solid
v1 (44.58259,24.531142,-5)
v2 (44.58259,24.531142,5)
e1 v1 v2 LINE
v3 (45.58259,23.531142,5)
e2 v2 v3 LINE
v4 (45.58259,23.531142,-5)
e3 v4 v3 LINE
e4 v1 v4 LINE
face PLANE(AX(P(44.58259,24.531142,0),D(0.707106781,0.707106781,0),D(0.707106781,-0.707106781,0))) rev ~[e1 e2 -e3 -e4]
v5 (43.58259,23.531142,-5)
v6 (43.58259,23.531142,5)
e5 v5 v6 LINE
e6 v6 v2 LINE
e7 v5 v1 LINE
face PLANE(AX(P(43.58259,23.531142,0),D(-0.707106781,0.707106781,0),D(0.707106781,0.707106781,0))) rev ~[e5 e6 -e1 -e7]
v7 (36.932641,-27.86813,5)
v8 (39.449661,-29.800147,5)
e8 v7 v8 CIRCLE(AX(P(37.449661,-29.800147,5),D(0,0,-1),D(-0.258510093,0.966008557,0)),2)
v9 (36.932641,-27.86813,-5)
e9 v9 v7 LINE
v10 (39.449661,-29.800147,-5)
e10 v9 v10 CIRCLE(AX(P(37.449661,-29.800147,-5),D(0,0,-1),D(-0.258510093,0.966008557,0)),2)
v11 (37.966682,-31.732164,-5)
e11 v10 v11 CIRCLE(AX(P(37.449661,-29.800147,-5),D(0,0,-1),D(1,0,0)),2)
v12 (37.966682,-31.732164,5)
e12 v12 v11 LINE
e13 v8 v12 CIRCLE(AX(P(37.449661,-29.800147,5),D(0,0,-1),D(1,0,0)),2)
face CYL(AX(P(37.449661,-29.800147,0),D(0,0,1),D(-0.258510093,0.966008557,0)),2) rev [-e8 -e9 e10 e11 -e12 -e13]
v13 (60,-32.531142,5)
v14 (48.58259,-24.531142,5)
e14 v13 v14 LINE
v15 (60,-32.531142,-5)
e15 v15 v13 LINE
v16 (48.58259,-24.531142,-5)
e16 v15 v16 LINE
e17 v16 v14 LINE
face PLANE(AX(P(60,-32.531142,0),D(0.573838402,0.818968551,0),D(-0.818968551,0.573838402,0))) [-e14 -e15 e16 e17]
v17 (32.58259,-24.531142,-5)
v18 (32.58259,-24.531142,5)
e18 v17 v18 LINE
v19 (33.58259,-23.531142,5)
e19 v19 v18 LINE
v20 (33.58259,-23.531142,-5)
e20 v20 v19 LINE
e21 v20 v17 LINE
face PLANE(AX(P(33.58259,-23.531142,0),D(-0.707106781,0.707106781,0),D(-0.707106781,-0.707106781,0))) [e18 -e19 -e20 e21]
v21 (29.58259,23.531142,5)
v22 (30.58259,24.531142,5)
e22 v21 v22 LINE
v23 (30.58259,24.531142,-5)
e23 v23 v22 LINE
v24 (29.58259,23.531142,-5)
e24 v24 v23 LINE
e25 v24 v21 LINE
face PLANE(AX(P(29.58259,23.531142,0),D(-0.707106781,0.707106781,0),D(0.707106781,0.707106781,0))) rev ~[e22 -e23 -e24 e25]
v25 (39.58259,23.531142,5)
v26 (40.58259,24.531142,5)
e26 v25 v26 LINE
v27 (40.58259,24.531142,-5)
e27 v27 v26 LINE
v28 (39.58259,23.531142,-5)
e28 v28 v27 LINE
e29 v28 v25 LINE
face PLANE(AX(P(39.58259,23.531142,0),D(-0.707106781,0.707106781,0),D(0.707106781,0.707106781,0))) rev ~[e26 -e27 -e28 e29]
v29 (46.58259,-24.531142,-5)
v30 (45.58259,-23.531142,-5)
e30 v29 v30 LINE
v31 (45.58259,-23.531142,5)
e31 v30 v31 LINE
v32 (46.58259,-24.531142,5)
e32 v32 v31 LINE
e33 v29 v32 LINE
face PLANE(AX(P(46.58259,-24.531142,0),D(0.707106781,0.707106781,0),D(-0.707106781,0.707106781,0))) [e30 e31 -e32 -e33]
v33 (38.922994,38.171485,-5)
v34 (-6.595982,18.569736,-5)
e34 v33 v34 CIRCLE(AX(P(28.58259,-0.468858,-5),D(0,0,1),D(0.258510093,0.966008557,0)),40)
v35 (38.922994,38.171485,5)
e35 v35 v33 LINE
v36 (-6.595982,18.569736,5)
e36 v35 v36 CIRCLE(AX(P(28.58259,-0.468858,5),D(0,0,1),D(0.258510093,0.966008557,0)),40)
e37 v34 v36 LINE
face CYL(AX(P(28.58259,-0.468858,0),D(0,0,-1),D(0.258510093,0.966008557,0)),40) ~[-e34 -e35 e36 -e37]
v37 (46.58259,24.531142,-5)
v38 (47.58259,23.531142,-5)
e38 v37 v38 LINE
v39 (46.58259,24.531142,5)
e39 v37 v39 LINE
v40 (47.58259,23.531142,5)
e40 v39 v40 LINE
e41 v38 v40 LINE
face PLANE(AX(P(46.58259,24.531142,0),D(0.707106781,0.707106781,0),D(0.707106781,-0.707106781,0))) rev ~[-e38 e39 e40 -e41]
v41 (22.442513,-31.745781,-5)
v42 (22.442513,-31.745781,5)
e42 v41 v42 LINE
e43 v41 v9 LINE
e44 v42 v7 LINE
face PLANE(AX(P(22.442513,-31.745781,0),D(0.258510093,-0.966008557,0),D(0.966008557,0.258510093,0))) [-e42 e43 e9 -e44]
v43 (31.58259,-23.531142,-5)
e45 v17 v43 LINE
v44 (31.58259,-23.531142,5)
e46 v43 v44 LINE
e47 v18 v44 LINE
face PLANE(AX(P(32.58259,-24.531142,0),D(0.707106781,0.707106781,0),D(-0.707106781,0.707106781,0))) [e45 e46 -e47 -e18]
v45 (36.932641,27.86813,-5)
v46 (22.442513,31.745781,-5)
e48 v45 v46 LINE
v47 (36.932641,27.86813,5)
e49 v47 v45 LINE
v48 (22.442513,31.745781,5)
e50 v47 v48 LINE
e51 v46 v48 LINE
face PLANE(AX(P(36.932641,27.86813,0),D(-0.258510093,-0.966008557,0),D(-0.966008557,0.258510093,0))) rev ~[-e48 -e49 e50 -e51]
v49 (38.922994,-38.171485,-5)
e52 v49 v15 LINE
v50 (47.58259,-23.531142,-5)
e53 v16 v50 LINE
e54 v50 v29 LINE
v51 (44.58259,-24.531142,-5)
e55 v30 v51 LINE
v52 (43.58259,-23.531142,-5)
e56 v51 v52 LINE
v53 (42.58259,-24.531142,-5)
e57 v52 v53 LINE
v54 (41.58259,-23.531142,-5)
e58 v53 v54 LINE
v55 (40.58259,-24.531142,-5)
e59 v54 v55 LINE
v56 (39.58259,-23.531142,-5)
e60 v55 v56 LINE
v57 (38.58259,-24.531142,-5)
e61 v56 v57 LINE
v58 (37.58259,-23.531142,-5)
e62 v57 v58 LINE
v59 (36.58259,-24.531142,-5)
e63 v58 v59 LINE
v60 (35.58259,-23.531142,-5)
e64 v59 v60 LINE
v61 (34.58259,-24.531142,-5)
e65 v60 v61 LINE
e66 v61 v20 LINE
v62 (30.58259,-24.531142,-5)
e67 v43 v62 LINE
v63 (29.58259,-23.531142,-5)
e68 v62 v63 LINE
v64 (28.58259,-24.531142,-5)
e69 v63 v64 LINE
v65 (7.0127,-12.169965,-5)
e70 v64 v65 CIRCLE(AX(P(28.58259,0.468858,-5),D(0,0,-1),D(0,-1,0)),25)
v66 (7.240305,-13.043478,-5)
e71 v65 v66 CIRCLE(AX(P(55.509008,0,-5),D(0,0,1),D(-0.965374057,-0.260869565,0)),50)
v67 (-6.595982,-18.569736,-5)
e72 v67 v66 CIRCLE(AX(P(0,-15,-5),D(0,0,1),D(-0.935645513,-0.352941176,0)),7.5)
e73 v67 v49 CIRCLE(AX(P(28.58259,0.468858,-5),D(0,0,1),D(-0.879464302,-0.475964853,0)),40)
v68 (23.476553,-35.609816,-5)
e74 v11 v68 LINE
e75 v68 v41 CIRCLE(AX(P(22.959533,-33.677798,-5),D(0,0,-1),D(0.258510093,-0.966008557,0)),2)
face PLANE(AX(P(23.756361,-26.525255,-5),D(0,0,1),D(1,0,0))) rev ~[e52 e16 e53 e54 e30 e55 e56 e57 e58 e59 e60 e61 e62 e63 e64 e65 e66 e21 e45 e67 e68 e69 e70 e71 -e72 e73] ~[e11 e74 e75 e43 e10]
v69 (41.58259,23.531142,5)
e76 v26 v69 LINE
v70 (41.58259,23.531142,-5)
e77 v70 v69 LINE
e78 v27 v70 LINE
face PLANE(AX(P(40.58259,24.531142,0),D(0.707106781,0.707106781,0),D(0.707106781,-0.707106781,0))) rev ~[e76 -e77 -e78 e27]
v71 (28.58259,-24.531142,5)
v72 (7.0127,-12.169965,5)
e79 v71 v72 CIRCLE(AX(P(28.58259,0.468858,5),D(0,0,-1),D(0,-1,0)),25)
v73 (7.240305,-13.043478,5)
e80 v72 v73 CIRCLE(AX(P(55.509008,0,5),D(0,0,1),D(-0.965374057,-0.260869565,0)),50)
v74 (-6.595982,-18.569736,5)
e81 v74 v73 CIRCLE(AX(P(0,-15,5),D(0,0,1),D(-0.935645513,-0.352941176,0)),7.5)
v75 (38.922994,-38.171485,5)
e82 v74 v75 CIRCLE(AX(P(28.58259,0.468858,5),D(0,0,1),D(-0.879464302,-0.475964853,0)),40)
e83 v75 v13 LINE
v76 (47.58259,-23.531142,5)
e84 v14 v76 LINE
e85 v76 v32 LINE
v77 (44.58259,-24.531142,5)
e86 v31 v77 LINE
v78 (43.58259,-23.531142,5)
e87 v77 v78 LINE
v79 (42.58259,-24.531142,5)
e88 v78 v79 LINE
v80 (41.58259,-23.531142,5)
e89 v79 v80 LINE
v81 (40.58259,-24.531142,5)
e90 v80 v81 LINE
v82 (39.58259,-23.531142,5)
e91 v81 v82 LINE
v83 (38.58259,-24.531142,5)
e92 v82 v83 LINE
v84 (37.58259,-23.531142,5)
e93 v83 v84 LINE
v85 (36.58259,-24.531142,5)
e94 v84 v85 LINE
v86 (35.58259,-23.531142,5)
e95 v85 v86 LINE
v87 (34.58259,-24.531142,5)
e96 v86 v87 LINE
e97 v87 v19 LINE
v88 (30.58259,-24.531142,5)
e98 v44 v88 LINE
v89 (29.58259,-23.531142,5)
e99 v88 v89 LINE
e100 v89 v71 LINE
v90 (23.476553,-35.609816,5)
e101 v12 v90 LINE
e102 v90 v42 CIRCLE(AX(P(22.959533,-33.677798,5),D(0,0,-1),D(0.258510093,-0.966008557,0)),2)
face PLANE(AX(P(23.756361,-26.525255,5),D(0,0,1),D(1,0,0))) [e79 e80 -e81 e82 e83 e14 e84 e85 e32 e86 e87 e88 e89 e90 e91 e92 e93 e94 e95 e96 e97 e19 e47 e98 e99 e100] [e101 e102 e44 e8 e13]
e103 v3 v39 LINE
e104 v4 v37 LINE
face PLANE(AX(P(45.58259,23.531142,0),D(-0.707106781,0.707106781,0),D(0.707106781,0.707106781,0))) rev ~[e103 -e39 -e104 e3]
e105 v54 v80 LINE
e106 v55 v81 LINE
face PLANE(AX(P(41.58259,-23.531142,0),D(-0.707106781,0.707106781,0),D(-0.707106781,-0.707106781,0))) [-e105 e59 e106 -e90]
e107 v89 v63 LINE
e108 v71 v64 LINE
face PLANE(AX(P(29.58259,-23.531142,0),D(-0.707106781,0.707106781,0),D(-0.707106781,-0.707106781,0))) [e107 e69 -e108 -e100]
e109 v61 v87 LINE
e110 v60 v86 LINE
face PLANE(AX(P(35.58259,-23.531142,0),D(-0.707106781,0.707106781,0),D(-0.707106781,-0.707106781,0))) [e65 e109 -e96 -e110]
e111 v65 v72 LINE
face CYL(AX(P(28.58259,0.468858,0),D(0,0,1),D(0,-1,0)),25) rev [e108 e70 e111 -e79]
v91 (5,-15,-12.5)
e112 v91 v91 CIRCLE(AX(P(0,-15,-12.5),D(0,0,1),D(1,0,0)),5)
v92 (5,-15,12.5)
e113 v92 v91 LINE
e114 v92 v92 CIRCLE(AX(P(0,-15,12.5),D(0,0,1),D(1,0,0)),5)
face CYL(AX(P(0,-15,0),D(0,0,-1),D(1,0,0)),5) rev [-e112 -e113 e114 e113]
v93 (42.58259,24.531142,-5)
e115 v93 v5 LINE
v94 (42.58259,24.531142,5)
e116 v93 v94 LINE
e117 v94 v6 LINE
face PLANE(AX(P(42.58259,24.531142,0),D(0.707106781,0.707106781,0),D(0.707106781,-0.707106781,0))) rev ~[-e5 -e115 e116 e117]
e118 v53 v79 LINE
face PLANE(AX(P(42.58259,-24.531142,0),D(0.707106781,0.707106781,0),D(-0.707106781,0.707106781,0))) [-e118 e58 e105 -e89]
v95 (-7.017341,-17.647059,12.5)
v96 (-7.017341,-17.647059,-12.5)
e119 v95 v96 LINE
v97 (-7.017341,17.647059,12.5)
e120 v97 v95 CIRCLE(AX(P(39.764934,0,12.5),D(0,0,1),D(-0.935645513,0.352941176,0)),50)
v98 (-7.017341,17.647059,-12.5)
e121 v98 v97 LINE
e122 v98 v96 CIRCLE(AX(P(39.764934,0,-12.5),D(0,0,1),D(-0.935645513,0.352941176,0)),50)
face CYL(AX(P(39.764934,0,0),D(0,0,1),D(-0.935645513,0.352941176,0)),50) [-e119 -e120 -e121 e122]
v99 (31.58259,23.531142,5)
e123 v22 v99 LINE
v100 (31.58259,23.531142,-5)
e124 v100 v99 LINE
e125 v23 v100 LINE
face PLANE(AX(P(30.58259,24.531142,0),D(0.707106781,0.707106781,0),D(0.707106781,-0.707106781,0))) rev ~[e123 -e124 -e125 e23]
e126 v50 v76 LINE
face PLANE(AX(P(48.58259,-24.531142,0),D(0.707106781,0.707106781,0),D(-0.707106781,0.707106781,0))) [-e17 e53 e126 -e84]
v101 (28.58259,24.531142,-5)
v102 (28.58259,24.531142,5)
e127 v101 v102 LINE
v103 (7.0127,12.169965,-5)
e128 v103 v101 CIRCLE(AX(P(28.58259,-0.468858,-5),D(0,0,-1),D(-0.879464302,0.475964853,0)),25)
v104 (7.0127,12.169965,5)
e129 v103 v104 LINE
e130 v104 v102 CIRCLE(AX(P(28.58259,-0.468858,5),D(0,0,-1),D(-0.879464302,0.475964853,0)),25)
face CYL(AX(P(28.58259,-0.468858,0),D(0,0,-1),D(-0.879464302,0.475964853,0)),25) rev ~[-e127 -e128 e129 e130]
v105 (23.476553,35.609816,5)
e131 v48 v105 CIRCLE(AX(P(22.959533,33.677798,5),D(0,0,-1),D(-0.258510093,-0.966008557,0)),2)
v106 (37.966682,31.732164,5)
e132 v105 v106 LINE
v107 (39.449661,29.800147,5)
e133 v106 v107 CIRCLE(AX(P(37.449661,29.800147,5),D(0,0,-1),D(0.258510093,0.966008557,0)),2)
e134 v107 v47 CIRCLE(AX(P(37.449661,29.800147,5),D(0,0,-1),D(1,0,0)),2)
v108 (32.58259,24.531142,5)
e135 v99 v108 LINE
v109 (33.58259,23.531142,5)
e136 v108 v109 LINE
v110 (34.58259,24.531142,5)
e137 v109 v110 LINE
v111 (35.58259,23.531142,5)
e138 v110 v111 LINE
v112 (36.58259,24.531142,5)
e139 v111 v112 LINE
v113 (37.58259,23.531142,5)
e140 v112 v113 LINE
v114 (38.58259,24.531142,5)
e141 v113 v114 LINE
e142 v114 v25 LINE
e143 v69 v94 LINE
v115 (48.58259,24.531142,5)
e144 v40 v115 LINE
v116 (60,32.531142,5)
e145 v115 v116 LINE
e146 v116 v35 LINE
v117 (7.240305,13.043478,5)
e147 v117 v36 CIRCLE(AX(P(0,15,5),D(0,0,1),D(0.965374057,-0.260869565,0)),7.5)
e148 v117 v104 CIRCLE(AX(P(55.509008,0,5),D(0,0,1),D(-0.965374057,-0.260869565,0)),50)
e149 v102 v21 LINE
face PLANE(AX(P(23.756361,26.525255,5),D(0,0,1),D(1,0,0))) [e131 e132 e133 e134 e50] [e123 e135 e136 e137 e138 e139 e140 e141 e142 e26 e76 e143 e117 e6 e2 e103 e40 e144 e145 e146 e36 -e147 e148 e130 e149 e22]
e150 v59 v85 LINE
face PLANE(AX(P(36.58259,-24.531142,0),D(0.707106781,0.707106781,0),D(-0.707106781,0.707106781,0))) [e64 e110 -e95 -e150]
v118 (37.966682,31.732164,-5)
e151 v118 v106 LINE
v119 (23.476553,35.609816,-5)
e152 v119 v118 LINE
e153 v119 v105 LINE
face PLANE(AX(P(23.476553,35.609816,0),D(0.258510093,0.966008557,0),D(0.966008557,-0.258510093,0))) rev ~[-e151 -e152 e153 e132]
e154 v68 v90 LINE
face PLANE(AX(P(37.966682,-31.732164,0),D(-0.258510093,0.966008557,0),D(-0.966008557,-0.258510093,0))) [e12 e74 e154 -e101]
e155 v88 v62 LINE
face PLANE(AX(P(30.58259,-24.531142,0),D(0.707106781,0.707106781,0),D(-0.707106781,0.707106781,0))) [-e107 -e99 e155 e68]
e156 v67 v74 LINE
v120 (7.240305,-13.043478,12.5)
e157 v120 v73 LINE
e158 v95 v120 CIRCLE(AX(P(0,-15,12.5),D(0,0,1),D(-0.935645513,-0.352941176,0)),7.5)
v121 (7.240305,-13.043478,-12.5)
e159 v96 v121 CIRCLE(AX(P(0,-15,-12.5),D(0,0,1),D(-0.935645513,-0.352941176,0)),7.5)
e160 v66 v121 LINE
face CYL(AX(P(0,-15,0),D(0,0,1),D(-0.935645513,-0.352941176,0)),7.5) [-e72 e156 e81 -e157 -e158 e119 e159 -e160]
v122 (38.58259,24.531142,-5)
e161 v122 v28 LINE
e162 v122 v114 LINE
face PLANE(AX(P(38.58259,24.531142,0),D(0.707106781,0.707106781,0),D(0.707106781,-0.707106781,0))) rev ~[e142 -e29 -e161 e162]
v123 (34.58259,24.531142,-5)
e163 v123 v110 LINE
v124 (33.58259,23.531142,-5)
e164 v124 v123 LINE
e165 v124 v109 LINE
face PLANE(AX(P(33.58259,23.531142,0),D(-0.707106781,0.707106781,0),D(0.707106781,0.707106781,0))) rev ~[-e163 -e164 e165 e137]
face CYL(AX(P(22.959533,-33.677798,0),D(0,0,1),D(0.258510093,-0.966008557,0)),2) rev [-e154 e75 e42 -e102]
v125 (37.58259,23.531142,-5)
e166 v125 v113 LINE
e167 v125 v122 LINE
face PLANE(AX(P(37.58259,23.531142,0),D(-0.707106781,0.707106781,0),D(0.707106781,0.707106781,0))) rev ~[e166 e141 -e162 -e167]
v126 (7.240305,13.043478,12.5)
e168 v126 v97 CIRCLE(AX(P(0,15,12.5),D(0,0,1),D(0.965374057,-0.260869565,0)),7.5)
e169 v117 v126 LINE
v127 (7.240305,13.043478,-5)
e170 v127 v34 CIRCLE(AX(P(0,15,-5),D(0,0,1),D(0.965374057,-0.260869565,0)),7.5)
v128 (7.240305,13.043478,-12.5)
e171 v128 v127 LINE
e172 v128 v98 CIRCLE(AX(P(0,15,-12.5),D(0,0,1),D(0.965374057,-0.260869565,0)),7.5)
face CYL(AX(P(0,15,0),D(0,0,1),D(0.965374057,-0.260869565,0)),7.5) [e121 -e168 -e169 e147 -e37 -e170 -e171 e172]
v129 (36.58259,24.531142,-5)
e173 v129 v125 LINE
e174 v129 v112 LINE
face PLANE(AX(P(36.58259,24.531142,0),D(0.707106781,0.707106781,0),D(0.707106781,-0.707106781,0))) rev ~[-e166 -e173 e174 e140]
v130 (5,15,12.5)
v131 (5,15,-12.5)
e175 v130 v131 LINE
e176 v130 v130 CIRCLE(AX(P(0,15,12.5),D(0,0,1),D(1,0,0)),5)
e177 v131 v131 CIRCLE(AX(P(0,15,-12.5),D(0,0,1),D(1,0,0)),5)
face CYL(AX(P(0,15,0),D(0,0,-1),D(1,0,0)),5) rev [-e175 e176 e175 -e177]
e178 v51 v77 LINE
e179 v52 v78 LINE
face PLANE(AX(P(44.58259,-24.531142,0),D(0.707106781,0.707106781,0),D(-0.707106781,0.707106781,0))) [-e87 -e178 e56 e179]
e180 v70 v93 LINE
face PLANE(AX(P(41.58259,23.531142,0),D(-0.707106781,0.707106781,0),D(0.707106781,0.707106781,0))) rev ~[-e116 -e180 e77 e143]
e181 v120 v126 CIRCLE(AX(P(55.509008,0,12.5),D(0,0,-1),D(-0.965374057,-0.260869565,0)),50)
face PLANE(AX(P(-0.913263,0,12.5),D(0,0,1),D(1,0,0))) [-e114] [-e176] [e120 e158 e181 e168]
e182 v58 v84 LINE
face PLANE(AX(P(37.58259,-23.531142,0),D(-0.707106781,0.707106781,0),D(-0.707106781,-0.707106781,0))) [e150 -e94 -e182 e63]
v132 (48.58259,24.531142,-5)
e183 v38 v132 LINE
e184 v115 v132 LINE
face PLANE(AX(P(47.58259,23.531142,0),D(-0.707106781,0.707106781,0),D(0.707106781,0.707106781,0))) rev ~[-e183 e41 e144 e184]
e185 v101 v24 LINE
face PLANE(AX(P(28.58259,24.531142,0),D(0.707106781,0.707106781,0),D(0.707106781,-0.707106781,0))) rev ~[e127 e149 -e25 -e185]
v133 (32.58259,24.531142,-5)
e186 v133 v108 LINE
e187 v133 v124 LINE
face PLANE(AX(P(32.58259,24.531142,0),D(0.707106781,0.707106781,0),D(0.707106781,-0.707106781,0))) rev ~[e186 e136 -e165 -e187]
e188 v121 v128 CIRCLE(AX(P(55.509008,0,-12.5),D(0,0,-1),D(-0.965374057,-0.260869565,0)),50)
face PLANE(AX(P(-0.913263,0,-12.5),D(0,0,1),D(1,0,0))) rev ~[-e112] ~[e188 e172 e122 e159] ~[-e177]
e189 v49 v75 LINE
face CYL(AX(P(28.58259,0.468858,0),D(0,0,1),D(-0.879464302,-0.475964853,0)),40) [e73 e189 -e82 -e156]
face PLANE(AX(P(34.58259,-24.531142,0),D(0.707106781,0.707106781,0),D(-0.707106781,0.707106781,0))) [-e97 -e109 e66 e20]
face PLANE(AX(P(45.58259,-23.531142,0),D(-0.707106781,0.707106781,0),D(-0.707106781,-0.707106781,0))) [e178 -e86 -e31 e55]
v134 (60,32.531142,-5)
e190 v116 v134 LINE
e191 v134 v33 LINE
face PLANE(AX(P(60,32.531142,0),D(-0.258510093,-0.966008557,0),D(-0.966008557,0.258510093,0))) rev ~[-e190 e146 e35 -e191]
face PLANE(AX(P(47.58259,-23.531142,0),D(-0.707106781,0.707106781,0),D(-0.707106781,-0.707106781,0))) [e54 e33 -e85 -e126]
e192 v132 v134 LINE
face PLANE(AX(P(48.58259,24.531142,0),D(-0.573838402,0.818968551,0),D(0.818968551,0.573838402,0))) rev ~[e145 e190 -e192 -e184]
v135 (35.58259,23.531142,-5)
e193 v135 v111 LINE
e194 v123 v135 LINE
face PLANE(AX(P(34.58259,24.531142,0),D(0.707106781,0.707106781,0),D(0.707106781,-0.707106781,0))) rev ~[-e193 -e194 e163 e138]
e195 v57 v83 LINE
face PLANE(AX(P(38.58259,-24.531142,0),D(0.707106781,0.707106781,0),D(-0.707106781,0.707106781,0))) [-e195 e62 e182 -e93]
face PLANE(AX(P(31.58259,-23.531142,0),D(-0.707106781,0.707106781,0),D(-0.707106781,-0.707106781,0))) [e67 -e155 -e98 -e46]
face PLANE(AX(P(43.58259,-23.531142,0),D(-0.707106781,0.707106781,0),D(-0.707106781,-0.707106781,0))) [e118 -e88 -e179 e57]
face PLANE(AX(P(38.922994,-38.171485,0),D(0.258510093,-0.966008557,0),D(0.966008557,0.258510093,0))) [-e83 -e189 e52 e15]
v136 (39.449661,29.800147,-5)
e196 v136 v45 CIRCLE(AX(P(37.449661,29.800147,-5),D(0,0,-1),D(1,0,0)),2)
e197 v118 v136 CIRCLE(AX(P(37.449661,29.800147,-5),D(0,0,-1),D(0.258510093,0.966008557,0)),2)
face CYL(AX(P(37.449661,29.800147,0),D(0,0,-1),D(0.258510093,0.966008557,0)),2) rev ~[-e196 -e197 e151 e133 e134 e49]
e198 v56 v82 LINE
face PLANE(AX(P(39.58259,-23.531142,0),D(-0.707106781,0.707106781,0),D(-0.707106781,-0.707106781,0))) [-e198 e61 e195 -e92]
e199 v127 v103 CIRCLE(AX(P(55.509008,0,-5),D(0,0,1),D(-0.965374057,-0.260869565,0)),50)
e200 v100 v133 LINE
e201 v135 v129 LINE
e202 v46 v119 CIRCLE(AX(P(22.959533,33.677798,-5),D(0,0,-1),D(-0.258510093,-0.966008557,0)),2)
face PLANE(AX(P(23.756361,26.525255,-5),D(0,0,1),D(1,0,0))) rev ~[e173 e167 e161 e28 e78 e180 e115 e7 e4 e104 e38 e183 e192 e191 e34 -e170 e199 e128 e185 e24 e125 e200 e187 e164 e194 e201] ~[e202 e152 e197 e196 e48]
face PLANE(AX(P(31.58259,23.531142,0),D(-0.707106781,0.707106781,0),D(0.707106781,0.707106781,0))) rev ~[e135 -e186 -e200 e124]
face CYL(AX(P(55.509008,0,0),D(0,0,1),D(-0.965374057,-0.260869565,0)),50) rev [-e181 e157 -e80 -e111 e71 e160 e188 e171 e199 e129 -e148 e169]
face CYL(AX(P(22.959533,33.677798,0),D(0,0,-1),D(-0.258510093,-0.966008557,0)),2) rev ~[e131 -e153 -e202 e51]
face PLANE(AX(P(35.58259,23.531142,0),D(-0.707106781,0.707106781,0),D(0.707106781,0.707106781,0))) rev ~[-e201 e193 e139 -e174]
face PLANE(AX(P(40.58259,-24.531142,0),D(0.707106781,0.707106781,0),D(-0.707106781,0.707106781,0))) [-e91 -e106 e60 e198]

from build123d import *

# Parameters (mm, degrees)
F0_R     = 5
F2_DEPTH = 12.5
F1_R     = 5
F3_DEPTH = 5


# Not quite as in the source:
# - a feature of the source that left no trace in its solid (it failed there, or was rolled back) is left out


with BuildPart() as f2:
    # F0 (on Top) → F2 (new body, symmetric)
    with BuildSketch(Plane.XY):
        with BuildLine():
            ThreePointArc((7.2403054276, -13.0434782609), (5.5090082779, 0), (7.2403054276, 13.0434782609))
            ThreePointArc((7.2403054276, 13.0434782609), (2.3044883911, 22.1371796429), (-7.0173413473, 17.6470588235))
            ThreePointArc((-7.0173413473, 17.6470588235), (-10.2350656985, 0), (-7.0173413473, -17.6470588235))
            ThreePointArc((-7.0173413473, -17.6470588235), (2.3044883911, -22.1371796429), (7.2403054276, -13.0434782609))
        make_face()
        with Locations((0, -15)):
            Circle(F0_R, mode=Mode.SUBTRACT)
        with Locations((0, 15)):
            Circle(F0_R, mode=Mode.SUBTRACT)
    extrude(amount=F2_DEPTH, both=True)

    # F1 (on Top) → F3 (join, symmetric)
    with BuildSketch(Plane.XY):
        with BuildLine():
            ThreePointArc((38.9229935461, 38.1714845638), (12.7620087728, 36.2695311392), (-6.5959822677, 18.5697363943))
            ThreePointArc((-6.5959822677, 18.5697363943), (-3.5697363943, 8.4040177323), (6.5959822677, 11.4302636057))
            ThreePointArc((6.5959822677, 11.4302636057), (15.785676778, 21.0076181762), (28.5825898266, 24.5311422915))
            Line((28.5825898266, 24.5311422915), (30.5825898266, 24.5311422915))
            Line((30.5825898266, 24.5311422915), (32.5825898266, 24.5311422915))
            Line((32.5825898266, 24.5311422915), (34.5825898266, 24.5311422915))
            Line((34.5825898266, 24.5311422915), (36.5825898266, 24.5311422915))
            Line((36.5825898266, 24.5311422915), (38.5825898266, 24.5311422915))
            Line((38.5825898266, 24.5311422915), (40.5825898266, 24.5311422915))
            Line((40.5825898266, 24.5311422915), (42.5825898266, 24.5311422915))
            Line((42.5825898266, 24.5311422915), (44.5825898266, 24.5311422915))
            Line((44.5825898266, 24.5311422915), (46.5825898266, 24.5311422915))
            Line((46.5825898266, 24.5311422915), (48.5825898266, 24.5311422915))
            Line((48.5825898266, 24.5311422915), (60, 32.5311422915))
            Line((60, 32.5311422915), (38.9229935461, 38.1714845638))
        make_face()
        with Locations((0, 15)):
            Circle(F1_R, mode=Mode.SUBTRACT)
        with BuildLine():
            ThreePointArc((22.4425128865, 31.74578129), (21.0275159589, 34.1948185896), (23.4765532585, 35.6098155172))
            Line((23.4765532585, 35.6098155172), (37.9666816106, 31.7321641224))
            ThreePointArc((37.9666816106, 31.7321641224), (39.0361733804, 31.017923595), (39.4496614246, 29.8001470088))
            ThreePointArc((39.4496614246, 29.8001470088), (38.6674380108, 28.2136350529), (36.9326412386, 27.8681298951))
            Line((36.9326412386, 27.8681298951), (22.4425128865, 31.74578129))
        make_face(mode=Mode.SUBTRACT)
        with BuildLine():
            Line((32.5825898266, -24.5311422915), (30.5825898266, -24.5311422915))
            Line((30.5825898266, -24.5311422915), (28.5825898266, -24.5311422915))
            ThreePointArc((28.5825898266, -24.5311422915), (15.785676778, -21.0076181762), (6.5959822677, -11.4302636057))
            ThreePointArc((6.5959822677, -11.4302636057), (-3.5697363943, -8.4040177323), (-6.5959822677, -18.5697363943))
            ThreePointArc((-6.5959822677, -18.5697363943), (12.7620087728, -36.2695311392), (38.9229935461, -38.1714845638))
            Line((38.9229935461, -38.1714845638), (60, -32.5311422915))
            Line((60, -32.5311422915), (48.5825898266, -24.5311422915))
            Line((48.5825898266, -24.5311422915), (46.5825898266, -24.5311422915))
            Line((46.5825898266, -24.5311422915), (44.5825898266, -24.5311422915))
            Line((44.5825898266, -24.5311422915), (42.5825898266, -24.5311422915))
            Line((42.5825898266, -24.5311422915), (40.5825898266, -24.5311422915))
            Line((40.5825898266, -24.5311422915), (38.5825898266, -24.5311422915))
            Line((38.5825898266, -24.5311422915), (36.5825898266, -24.5311422915))
            Line((36.5825898266, -24.5311422915), (34.5825898266, -24.5311422915))
            Line((34.5825898266, -24.5311422915), (32.5825898266, -24.5311422915))
        make_face()
        with Locations((0, -15)):
            Circle(F1_R, mode=Mode.SUBTRACT)
        with BuildLine():
            ThreePointArc((23.4765532585, -35.6098155172), (21.0275159589, -34.1948185896), (22.4425128865, -31.74578129))
            Line((22.4425128865, -31.74578129), (36.9326412386, -27.8681298951))
            ThreePointArc((36.9326412386, -27.8681298951), (38.6674380108, -28.2136350529), (39.4496614246, -29.8001470088))
            ThreePointArc((39.4496614246, -29.8001470088), (39.0361733804, -31.017923595), (37.9666816106, -31.7321641224))
            Line((37.9666816106, -31.7321641224), (23.4765532585, -35.6098155172))
        make_face(mode=Mode.SUBTRACT)
        Polygon((30.5825898266, 24.5311422915), (28.5825898266, 24.5311422915), (29.5825898266, 23.5311422915), align=None)
        Polygon((32.5825898266, 24.5311422915), (30.5825898266, 24.5311422915), (31.5825898266, 23.5311422915), align=None)
        Polygon((34.5825898266, 24.5311422915), (32.5825898266, 24.5311422915), (33.5825898266, 23.5311422915), align=None)
        Polygon((36.5825898266, 24.5311422915), (34.5825898266, 24.5311422915), (35.5825898266, 23.5311422915), align=None)
        Polygon((38.5825898266, 24.5311422915), (36.5825898266, 24.5311422915), (37.5825898266, 23.5311422915), align=None)
        Polygon((40.5825898266, 24.5311422915), (38.5825898266, 24.5311422915), (39.5825898266, 23.5311422915), align=None)
        Polygon((41.5825898266, 23.5311422915), (42.5825898266, 24.5311422915), (40.5825898266, 24.5311422915), align=None)
        Polygon((43.5825898266, 23.5311422915), (44.5825898266, 24.5311422915), (42.5825898266, 24.5311422915), align=None)
        Polygon((45.5825898266, 23.5311422915), (46.5825898266, 24.5311422915), (44.5825898266, 24.5311422915), align=None)
        Polygon((47.5825898266, 23.5311422915), (48.5825898266, 24.5311422915), (46.5825898266, 24.5311422915), align=None)
        Polygon((30.5825898266, -24.5311422915), (29.5825898266, -23.5311422915), (28.5825898266, -24.5311422915), align=None)
        Polygon((31.5825898266, -23.5311422915), (30.5825898266, -24.5311422915), (32.5825898266, -24.5311422915), align=None)
        Polygon((33.5825898266, -23.5311422915), (32.5825898266, -24.5311422915), (34.5825898266, -24.5311422915), align=None)
        Polygon((35.5825898266, -23.5311422915), (34.5825898266, -24.5311422915), (36.5825898266, -24.5311422915), align=None)
        Polygon((37.5825898266, -23.5311422915), (36.5825898266, -24.5311422915), (38.5825898266, -24.5311422915), align=None)
        Polygon((39.5825898266, -23.5311422915), (38.5825898266, -24.5311422915), (40.5825898266, -24.5311422915), align=None)
        Polygon((41.5825898266, -23.5311422915), (40.5825898266, -24.5311422915), (42.5825898266, -24.5311422915), align=None)
        Polygon((43.5825898266, -23.5311422915), (42.5825898266, -24.5311422915), (44.5825898266, -24.5311422915), align=None)
        Polygon((44.5825898266, -24.5311422915), (46.5825898266, -24.5311422915), (45.5825898266, -23.5311422915), align=None)
        Polygon((46.5825898266, -24.5311422915), (48.5825898266, -24.5311422915), (47.5825898266, -23.5311422915), align=None)
    extrude(amount=F3_DEPTH, both=True)


solid = f2.part
